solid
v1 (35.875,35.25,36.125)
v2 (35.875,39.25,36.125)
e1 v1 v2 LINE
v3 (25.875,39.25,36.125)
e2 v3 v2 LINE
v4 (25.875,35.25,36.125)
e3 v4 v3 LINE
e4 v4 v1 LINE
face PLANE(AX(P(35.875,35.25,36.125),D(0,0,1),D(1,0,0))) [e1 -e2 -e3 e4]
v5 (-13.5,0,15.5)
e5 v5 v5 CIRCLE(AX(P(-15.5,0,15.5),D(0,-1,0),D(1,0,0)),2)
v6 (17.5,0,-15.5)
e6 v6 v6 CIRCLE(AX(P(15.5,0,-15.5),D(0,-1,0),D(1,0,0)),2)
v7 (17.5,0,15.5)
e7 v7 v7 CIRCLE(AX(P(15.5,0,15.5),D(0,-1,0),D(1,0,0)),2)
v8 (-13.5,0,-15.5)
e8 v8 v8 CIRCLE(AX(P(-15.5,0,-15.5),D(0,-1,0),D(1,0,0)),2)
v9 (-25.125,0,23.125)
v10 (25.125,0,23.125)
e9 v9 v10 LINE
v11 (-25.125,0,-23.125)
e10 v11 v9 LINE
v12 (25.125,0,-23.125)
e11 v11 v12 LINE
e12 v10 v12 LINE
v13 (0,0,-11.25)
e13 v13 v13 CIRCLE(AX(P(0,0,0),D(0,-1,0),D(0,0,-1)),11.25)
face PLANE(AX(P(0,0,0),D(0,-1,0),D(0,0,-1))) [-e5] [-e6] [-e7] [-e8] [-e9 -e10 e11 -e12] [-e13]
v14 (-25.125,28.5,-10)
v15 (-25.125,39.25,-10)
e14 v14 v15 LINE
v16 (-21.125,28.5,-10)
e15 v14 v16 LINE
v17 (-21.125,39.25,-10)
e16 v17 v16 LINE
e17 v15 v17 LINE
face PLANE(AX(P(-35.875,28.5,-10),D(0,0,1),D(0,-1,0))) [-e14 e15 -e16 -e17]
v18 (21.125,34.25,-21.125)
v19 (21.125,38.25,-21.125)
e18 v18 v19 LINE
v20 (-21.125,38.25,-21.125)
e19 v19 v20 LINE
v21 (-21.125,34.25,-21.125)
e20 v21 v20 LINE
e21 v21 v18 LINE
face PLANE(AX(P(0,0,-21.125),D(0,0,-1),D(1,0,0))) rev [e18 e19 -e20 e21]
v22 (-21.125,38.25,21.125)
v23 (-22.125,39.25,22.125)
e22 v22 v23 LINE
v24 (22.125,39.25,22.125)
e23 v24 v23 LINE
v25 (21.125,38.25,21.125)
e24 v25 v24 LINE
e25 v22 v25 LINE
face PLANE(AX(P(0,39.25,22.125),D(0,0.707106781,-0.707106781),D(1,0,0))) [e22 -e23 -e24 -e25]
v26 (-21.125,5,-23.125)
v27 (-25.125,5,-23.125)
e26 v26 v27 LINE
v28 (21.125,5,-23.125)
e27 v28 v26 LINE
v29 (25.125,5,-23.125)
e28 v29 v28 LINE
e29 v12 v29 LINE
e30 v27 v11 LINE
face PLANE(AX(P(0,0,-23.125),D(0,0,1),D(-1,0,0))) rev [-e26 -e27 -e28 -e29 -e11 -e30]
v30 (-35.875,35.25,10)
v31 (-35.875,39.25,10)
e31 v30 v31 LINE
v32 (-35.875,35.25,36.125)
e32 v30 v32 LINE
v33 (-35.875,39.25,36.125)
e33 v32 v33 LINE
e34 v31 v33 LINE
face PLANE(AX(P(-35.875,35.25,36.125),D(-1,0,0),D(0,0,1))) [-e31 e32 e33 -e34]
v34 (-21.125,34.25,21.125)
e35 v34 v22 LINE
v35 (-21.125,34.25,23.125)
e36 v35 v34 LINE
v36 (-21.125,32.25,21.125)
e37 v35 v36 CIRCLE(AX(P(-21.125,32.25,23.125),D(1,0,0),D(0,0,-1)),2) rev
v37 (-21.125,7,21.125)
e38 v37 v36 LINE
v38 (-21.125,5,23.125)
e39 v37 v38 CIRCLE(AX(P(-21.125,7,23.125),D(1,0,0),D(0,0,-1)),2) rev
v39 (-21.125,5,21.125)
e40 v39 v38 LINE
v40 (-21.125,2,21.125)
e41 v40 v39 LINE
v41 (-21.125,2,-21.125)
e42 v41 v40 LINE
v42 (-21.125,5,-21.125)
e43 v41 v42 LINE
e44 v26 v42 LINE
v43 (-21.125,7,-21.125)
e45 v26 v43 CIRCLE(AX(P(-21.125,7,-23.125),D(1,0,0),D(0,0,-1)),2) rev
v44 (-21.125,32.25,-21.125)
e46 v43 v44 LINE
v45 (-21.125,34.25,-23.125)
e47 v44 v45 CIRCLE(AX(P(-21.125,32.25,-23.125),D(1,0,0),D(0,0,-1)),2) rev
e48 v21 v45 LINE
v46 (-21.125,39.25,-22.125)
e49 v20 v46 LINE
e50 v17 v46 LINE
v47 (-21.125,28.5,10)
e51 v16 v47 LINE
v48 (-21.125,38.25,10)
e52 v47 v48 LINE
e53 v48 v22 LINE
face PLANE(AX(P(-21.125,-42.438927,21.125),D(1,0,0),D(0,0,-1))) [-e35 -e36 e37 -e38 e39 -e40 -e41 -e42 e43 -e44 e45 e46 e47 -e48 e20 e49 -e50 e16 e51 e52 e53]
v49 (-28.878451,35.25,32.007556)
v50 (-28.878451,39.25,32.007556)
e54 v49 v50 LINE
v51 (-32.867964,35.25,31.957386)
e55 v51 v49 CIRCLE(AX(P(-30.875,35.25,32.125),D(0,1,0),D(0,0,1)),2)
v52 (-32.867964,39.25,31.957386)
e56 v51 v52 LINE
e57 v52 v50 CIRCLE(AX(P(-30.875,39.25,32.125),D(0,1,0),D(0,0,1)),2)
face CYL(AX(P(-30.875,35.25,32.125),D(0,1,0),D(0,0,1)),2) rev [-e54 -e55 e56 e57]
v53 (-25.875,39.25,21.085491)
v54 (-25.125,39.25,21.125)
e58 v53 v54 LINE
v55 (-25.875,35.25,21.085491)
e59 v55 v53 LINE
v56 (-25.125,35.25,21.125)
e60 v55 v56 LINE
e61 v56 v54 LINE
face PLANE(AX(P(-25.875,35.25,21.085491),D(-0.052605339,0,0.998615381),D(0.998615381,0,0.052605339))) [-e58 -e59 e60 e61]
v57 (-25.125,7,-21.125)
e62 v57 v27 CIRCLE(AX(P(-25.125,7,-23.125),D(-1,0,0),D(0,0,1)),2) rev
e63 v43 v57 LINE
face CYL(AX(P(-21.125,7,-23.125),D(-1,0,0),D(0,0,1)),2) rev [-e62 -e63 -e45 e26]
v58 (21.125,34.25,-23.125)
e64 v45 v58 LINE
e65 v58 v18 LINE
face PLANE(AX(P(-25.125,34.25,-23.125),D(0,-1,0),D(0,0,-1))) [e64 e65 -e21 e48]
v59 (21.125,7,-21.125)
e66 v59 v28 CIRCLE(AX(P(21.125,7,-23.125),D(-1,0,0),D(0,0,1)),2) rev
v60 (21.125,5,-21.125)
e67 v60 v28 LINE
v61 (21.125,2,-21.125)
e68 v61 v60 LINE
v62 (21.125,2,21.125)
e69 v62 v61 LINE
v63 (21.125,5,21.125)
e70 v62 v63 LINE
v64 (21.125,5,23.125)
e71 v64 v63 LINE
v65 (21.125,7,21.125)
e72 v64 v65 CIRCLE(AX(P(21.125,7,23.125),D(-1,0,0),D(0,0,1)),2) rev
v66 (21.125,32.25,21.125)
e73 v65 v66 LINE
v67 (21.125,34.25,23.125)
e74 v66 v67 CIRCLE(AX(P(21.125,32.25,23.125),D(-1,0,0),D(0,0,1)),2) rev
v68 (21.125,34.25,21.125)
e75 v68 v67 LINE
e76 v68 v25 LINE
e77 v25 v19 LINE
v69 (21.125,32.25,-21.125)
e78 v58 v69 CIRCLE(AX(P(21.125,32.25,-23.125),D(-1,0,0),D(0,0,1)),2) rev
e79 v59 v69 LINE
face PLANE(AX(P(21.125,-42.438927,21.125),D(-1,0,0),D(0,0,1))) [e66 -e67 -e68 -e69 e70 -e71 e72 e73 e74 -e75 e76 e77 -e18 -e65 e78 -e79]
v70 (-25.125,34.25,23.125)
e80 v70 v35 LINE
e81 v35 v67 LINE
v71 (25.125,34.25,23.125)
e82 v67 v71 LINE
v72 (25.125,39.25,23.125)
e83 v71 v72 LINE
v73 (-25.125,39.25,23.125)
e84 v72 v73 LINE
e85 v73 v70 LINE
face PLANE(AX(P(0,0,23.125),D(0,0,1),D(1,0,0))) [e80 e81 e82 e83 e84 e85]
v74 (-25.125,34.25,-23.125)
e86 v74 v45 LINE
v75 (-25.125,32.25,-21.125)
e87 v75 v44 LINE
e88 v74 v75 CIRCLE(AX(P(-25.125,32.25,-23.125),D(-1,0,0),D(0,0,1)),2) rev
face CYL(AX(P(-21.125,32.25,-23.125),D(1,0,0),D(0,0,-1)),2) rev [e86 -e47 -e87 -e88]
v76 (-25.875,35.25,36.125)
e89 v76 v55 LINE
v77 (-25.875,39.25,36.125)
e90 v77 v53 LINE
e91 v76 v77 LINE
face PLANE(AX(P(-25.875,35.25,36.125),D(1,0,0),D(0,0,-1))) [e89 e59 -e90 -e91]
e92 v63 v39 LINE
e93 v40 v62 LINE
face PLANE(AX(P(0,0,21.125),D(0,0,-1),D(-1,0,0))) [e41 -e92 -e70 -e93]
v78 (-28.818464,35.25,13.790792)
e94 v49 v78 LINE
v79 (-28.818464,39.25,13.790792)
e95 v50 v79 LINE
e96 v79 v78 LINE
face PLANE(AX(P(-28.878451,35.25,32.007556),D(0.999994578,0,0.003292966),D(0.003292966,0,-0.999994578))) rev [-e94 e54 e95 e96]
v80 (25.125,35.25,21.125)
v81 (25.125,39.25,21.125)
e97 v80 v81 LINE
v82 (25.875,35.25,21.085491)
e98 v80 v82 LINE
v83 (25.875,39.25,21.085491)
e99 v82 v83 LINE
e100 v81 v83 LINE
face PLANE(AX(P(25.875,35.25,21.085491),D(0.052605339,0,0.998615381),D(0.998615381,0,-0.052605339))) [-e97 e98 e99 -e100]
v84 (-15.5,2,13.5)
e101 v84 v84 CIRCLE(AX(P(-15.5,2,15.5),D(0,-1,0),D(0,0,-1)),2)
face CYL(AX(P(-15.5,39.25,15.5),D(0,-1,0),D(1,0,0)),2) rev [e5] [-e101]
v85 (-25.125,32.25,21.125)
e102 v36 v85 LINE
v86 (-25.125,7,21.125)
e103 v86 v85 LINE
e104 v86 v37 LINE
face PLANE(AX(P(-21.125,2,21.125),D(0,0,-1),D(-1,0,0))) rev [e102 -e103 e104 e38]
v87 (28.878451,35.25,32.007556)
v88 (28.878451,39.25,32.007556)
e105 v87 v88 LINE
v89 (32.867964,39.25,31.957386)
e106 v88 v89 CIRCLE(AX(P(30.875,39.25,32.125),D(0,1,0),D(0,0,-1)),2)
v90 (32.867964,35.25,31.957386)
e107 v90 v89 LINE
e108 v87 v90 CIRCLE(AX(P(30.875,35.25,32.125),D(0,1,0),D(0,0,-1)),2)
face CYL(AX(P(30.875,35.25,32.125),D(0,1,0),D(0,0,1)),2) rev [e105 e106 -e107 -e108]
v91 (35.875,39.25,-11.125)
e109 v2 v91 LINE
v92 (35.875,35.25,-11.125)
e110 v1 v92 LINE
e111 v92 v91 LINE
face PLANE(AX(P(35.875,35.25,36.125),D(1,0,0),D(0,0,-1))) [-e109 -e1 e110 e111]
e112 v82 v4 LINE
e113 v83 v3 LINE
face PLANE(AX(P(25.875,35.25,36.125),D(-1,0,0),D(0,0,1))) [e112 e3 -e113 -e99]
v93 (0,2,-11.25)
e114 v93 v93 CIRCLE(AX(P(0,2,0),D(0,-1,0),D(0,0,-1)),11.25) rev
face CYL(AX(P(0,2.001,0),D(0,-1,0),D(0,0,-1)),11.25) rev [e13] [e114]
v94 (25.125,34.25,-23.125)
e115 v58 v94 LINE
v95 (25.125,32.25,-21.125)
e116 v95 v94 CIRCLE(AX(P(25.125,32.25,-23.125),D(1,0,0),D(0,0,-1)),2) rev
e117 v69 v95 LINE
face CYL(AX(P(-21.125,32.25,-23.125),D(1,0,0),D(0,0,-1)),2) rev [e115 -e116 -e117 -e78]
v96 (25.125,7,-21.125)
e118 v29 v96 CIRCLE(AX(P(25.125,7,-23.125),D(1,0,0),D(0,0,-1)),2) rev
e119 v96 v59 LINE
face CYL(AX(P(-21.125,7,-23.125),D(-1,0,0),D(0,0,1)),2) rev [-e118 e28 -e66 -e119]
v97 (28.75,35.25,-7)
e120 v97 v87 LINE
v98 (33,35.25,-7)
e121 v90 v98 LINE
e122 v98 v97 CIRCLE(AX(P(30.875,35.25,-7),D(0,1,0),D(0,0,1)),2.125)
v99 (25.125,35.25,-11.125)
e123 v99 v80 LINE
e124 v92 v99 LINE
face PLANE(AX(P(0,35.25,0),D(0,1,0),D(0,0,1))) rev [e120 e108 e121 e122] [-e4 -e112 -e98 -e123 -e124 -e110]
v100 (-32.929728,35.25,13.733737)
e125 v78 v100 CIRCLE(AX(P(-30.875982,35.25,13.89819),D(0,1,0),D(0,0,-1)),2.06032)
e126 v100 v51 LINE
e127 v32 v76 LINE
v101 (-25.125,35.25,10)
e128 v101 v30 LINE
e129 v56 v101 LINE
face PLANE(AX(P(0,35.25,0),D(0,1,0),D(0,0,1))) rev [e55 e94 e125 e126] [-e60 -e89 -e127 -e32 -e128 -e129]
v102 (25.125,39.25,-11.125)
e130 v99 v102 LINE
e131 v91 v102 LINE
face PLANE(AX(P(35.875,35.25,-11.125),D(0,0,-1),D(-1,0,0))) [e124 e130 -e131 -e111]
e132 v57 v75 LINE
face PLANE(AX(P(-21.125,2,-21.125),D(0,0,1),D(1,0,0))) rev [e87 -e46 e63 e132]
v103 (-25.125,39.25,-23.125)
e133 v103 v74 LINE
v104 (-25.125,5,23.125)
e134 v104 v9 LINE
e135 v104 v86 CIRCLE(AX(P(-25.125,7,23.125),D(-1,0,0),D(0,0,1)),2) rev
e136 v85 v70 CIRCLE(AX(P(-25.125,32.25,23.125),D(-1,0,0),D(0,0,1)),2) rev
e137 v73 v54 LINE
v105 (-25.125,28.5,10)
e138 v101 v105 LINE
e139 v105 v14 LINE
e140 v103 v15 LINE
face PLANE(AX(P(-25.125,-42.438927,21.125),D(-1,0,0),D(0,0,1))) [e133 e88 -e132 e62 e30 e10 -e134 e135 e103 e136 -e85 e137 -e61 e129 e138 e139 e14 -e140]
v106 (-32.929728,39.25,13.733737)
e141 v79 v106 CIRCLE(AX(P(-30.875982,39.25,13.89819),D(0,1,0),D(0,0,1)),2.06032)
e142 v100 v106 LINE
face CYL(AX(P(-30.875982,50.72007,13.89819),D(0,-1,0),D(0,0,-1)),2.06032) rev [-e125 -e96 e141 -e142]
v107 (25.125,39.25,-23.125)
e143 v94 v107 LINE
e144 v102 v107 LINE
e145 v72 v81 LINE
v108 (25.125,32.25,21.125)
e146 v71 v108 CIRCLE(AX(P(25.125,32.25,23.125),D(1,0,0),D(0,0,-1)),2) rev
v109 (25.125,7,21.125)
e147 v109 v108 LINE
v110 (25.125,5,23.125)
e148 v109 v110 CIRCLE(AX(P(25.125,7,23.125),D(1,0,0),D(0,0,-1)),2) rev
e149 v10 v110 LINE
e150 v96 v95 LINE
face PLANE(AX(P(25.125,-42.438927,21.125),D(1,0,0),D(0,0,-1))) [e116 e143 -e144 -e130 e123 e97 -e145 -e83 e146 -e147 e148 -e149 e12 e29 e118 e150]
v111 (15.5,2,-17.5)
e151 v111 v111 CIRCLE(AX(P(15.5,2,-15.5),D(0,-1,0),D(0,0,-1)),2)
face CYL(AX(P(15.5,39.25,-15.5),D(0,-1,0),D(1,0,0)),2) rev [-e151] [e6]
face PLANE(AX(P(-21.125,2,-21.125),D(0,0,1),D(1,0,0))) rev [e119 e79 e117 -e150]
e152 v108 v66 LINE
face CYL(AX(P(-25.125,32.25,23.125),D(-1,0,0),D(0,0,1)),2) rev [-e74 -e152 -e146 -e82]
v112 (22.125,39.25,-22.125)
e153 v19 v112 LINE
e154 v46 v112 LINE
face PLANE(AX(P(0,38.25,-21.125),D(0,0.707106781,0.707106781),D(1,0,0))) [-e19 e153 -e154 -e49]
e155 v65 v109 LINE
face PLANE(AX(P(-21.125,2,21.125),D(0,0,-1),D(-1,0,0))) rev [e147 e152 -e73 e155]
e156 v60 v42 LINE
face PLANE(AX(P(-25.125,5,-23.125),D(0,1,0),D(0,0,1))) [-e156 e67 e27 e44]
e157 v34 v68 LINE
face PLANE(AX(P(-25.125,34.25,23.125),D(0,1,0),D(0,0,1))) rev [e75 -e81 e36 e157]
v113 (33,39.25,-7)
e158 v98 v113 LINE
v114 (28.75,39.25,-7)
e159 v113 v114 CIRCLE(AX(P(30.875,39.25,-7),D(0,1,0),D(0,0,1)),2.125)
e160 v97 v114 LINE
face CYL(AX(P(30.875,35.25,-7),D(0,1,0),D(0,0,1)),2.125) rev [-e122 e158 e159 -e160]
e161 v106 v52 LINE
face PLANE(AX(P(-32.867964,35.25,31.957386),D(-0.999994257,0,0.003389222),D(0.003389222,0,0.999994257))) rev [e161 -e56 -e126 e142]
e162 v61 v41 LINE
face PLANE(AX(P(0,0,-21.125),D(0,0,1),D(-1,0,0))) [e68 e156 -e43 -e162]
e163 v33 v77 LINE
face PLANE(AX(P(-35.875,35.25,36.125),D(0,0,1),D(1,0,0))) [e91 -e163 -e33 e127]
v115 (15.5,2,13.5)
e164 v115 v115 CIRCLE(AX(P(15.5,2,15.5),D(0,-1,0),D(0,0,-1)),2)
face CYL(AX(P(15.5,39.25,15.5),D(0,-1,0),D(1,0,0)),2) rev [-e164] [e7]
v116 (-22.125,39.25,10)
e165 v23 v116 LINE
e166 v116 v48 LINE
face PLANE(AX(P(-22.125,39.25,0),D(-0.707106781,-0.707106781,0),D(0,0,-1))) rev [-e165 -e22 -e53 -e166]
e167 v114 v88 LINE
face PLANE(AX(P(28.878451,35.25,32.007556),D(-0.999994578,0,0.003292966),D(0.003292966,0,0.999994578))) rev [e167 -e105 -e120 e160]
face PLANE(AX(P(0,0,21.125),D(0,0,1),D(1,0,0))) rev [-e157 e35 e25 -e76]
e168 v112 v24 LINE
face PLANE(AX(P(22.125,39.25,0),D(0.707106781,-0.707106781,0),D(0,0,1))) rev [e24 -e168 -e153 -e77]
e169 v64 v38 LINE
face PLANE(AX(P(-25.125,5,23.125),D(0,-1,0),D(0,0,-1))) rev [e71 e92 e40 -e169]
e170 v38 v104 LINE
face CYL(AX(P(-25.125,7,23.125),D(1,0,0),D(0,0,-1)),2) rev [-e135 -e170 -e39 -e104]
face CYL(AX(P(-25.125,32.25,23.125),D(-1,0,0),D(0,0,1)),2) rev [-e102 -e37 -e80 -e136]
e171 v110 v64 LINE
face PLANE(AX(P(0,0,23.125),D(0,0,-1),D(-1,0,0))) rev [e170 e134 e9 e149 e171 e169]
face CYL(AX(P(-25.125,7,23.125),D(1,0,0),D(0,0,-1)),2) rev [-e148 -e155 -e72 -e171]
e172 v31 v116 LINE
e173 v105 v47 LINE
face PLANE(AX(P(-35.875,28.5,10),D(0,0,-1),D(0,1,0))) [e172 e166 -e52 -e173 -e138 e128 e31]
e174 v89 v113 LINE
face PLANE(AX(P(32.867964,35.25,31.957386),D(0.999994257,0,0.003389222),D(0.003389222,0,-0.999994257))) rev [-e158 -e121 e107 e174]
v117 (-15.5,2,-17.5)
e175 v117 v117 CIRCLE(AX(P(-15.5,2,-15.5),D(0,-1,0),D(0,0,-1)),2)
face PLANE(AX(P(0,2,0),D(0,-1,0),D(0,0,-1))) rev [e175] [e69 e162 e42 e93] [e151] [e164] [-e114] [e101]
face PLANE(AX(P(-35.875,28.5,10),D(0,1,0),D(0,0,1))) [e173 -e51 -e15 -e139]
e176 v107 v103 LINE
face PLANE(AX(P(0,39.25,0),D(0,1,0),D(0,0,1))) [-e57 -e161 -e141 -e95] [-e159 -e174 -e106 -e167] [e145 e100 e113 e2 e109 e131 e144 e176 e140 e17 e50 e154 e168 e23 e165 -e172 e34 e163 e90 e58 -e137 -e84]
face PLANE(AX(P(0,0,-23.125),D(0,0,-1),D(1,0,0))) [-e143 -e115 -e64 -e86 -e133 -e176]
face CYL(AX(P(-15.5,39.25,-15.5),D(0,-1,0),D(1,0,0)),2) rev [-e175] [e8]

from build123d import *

# Parameters (mm, degrees)
SKETCH1_W                      = 42.25
SKETCH1_H                      = 42.25
BOSS_EXTRUDE1_DEPTH            = 2
CUT_EXTRUDE1_REACH             = 31.942
SKETCH7_R                      = 11.25
BOSS_EXTRUDE6_DEPTH            = 37.25
BOSS_EXTRUDE6_DEPTH_BACK       = 2
SKETCH9_W                      = 4
SKETCH9_H                      = 42.25
BOSS_EXTRUDE7_DEPTH            = 4
CUT_EXTRUDE2_REACH             = 83.034
SKETCH11_W                     = 10.75
SKETCH11_H                     = 20
CUT_EXTRUDE2_DIRECTION_2_DEPTH = 82.034425555
SKETCH12_W                     = 50.25
SKETCH12_H                     = 5
BOSS_EXTRUDE8_DEPTH            = 2
FILLET2_R                      = 2
CUT_EXTRUDE4_DEPTH             = 64.084021352
CUT_EXTRUDE4_DEPTH_BACK        = 64.084021352
SKETCH13_R                     = 2
CHAMFER1_SIZE                  = 1
CUT_EXTRUDE5_REACH             = 63.924
SKETCH14_W                     = 12.88865459
SKETCH14_H                     = 5.96822717
CUT_EXTRUDE5_DIRECTION_2_DEPTH = 62.924096683
BOSS_EXTRUDE9_DEPTH            = 4


with BuildPart() as part:
    # Sketch1 → Boss-Extrude1 (new body)
    with BuildSketch(Plane(origin=(0, 0, 0), x_dir=(1, 0, 0), z_dir=(0, 1, 0))):
        Rectangle(SKETCH1_W, SKETCH1_H)
    extrude(amount=BOSS_EXTRUDE1_DEPTH)

    # Sketch7 → Cut-Extrude1 (cut, up to next)
    with BuildSketch(Plane.XZ, mode=Mode.PRIVATE) as cut_extrude1_sk1:
        with Locations(Location((0, 0, 0), (0, 0, 270))):
            Circle(SKETCH7_R)
    cut_extrude1_tool1 = extrude(cut_extrude1_sk1.sketch, amount=-CUT_EXTRUDE1_REACH, mode=Mode.PRIVATE) & part.part
    add(cut_extrude1_tool1.solids().sort_by_distance((0, 0, 0))[0], mode=Mode.SUBTRACT)

    # Sketch9 → Boss-Extrude6 (add, two sides: drawn at the far end of the back side and taken through both)
    with BuildSketch(Plane(origin=(0, 2, 0), x_dir=(1, 0, 0), z_dir=(0, 1, 0)).offset(-BOSS_EXTRUDE6_DEPTH_BACK)):
        with Locations((-23.125, 0)):
            Rectangle(SKETCH9_W, SKETCH9_H)
        with Locations((23.125, 0)):
            Rectangle(SKETCH9_W, SKETCH9_H)
    extrude(amount=BOSS_EXTRUDE6_DEPTH + BOSS_EXTRUDE6_DEPTH_BACK)

    # Sketch8 → Boss-Extrude7 (add)
    # profile 1 of 2: a face of its own
    with BuildSketch(Plane(origin=(0, 39.25, 0), x_dir=(1, 0, 0), z_dir=(0, 1, 0))):
        Polygon((-25.125, -21.125), (-25.125, 11.125), (-35.875, 11.125), (-35.875, -36.125), (-25.875, -36.125), (-25.875, -21.085491291), align=None)
        with BuildLine():
            Line((-32.867964016, -31.957386071), (-33, 7))
            ThreePointArc((-33, 7), (-30.875, 9.125), (-28.75, 7))
            Line((-28.75, 7), (-28.878451254, -32.007555956))
            ThreePointArc((-28.878451254, -32.007555956), (-30.900148895, -34.124841877), (-32.867964016, -31.957386071))
        make_face(mode=Mode.SUBTRACT)
    # profile 2 of 2: a face of its own
    with BuildSketch(Plane(origin=(0, 39.25, 0), x_dir=(1, 0, 0), z_dir=(0, 1, 0))):
        Polygon((25.875, -21.085491291), (25.125, -21.125), (25.125, 11.125), (35.875, 11.125), (35.875, -36.125), (25.875, -36.125), align=None)
        with BuildLine():
            Line((28.878451254, -32.007555956), (28.75, 7))
            ThreePointArc((28.75, 7), (30.875, 9.125), (33, 7))
            Line((33, 7), (32.867964016, -31.957386071))
            ThreePointArc((32.867964016, -31.957386071), (30.900148895, -34.124841877), (28.878451254, -32.007555956))
        make_face(mode=Mode.SUBTRACT)
    extrude(amount=-BOSS_EXTRUDE7_DEPTH)

    # Sketch11 → Cut-Extrude2 (cut, up to next)
    with BuildSketch(Plane(origin=(-25.125, 0, 0), x_dir=(0, -1, 0), z_dir=(-1, 0, 0)), mode=Mode.PRIVATE) as cut_extrude2_sk1:
        with Locations((-33.875, 0)):
            Rectangle(SKETCH11_W, SKETCH11_H)
    cut_extrude2_tool1 = extrude(cut_extrude2_sk1.sketch, amount=-CUT_EXTRUDE2_REACH, mode=Mode.PRIVATE) & part.part
    add(cut_extrude2_tool1.solids().sort_by_distance((-25.125, 33.875, 0))[0], mode=Mode.SUBTRACT)

    # Sketch11 → Cut-Extrude2 direction 2 (cut)
    with BuildSketch(Plane(origin=(-25.125, 0, 0), x_dir=(0, -1, 0), z_dir=(-1, 0, 0))):
        with Locations((-33.875, 0)):
            Rectangle(SKETCH11_W, SKETCH11_H)
    extrude(amount=CUT_EXTRUDE2_DIRECTION_2_DEPTH, mode=Mode.SUBTRACT)

    # Sketch12 → Boss-Extrude8 (add)
    with BuildSketch(Plane.XY.offset(21.125)):
        with Locations((0, 36.75)):
            Rectangle(SKETCH12_W, SKETCH12_H)
        with Locations((0, 2.5)):
            Rectangle(SKETCH12_W, SKETCH12_H)
    boss_extrude8 = extrude(amount=BOSS_EXTRUDE8_DEPTH)

    # Mirror1: Boss-Extrude8 across plane
    add(boss_extrude8.mirror(Plane.XY))

    # Fillet2
    fillet2_edges = [part.edges().sort_by_distance(p)[0] for p in [
        (-23.125, 5, -21.125),
        (23.125, 5, -21.125),
        (23.125, 34.25, -21.125),
        (-23.125, 34.25, -21.125),
        (23.125, 34.25, 21.125),
        (23.125, 5, 21.125),
        (-23.125, 5, 21.125),
        (-23.125, 34.25, 21.125),
    ]]
    fillet(fillet2_edges, radius=FILLET2_R - 0.0001)  # a hair under: the kernel refuses the full size

    # Sketch13 → Cut-Extrude4 (cut, two sides: drawn at the far end of the back side and taken through both)
    with BuildSketch(Plane.XZ.offset(-2).offset(-CUT_EXTRUDE4_DEPTH_BACK)):
        with Locations((-15.499999999, 15.5)):
            Circle(SKETCH13_R)
        with Locations((15.500000001, 15.5)):
            Circle(SKETCH13_R)
        with Locations((15.500000001, -15.5)):
            Circle(SKETCH13_R)
        with Locations((-15.499999999, -15.5)):
            Circle(SKETCH13_R)
    extrude(amount=CUT_EXTRUDE4_DEPTH + CUT_EXTRUDE4_DEPTH_BACK, mode=Mode.SUBTRACT)

    # Chamfer1
    chamfer1_edges = [part.edges().sort_by_distance(p)[0] for p in [
        (0, 39.25, 21.125),
        (0, 39.25, -21.125),
        (-21.125, 39.25, 15.5625),
        (21.125, 39.25, 0),
    ]]
    chamfer(chamfer1_edges, length=CHAMFER1_SIZE)

    # Sketch14 → Cut-Extrude5 (cut, up to next)
    with BuildSketch(Plane.XZ.offset(-35.25), mode=Mode.PRIVATE) as cut_extrude5_sk1:
        with Locations((-31.569327295, -11.445399839)):
            Rectangle(SKETCH14_W, SKETCH14_H)
    cut_extrude5_tool1 = extrude(cut_extrude5_sk1.sketch, amount=-CUT_EXTRUDE5_REACH, mode=Mode.PRIVATE) & part.part
    add(cut_extrude5_tool1.solids().sort_by_distance((-31.569327, 35.25, -11.4454))[0], mode=Mode.SUBTRACT)

    # Sketch14 → Cut-Extrude5 direction 2 (cut)
    with BuildSketch(Plane.XZ.offset(-35.25)):
        with Locations((-31.569327295, -11.445399839)):
            Rectangle(SKETCH14_W, SKETCH14_H)
    extrude(amount=CUT_EXTRUDE5_DIRECTION_2_DEPTH, mode=Mode.SUBTRACT)

    # Sketch15 → Boss-Extrude9 (add)
    with BuildSketch(Plane.XZ.offset(-35.25)):
        with BuildLine():
            Line((-25.125, 10), (-35.875, 10))
            Line((-35.875, 10), (-35.875, 14))
            Line((-35.875, 14), (-32.933785094, 14))
            ThreePointArc((-32.933785094, 14), (-30.875982387, 11.837870103), (-28.81817968, 14))
            Line((-28.81817968, 14), (-25.125, 14))
            Line((-25.125, 14), (-25.125, 10))
        make_face()
    extrude(amount=-BOSS_EXTRUDE9_DEPTH)


solid = part.part
